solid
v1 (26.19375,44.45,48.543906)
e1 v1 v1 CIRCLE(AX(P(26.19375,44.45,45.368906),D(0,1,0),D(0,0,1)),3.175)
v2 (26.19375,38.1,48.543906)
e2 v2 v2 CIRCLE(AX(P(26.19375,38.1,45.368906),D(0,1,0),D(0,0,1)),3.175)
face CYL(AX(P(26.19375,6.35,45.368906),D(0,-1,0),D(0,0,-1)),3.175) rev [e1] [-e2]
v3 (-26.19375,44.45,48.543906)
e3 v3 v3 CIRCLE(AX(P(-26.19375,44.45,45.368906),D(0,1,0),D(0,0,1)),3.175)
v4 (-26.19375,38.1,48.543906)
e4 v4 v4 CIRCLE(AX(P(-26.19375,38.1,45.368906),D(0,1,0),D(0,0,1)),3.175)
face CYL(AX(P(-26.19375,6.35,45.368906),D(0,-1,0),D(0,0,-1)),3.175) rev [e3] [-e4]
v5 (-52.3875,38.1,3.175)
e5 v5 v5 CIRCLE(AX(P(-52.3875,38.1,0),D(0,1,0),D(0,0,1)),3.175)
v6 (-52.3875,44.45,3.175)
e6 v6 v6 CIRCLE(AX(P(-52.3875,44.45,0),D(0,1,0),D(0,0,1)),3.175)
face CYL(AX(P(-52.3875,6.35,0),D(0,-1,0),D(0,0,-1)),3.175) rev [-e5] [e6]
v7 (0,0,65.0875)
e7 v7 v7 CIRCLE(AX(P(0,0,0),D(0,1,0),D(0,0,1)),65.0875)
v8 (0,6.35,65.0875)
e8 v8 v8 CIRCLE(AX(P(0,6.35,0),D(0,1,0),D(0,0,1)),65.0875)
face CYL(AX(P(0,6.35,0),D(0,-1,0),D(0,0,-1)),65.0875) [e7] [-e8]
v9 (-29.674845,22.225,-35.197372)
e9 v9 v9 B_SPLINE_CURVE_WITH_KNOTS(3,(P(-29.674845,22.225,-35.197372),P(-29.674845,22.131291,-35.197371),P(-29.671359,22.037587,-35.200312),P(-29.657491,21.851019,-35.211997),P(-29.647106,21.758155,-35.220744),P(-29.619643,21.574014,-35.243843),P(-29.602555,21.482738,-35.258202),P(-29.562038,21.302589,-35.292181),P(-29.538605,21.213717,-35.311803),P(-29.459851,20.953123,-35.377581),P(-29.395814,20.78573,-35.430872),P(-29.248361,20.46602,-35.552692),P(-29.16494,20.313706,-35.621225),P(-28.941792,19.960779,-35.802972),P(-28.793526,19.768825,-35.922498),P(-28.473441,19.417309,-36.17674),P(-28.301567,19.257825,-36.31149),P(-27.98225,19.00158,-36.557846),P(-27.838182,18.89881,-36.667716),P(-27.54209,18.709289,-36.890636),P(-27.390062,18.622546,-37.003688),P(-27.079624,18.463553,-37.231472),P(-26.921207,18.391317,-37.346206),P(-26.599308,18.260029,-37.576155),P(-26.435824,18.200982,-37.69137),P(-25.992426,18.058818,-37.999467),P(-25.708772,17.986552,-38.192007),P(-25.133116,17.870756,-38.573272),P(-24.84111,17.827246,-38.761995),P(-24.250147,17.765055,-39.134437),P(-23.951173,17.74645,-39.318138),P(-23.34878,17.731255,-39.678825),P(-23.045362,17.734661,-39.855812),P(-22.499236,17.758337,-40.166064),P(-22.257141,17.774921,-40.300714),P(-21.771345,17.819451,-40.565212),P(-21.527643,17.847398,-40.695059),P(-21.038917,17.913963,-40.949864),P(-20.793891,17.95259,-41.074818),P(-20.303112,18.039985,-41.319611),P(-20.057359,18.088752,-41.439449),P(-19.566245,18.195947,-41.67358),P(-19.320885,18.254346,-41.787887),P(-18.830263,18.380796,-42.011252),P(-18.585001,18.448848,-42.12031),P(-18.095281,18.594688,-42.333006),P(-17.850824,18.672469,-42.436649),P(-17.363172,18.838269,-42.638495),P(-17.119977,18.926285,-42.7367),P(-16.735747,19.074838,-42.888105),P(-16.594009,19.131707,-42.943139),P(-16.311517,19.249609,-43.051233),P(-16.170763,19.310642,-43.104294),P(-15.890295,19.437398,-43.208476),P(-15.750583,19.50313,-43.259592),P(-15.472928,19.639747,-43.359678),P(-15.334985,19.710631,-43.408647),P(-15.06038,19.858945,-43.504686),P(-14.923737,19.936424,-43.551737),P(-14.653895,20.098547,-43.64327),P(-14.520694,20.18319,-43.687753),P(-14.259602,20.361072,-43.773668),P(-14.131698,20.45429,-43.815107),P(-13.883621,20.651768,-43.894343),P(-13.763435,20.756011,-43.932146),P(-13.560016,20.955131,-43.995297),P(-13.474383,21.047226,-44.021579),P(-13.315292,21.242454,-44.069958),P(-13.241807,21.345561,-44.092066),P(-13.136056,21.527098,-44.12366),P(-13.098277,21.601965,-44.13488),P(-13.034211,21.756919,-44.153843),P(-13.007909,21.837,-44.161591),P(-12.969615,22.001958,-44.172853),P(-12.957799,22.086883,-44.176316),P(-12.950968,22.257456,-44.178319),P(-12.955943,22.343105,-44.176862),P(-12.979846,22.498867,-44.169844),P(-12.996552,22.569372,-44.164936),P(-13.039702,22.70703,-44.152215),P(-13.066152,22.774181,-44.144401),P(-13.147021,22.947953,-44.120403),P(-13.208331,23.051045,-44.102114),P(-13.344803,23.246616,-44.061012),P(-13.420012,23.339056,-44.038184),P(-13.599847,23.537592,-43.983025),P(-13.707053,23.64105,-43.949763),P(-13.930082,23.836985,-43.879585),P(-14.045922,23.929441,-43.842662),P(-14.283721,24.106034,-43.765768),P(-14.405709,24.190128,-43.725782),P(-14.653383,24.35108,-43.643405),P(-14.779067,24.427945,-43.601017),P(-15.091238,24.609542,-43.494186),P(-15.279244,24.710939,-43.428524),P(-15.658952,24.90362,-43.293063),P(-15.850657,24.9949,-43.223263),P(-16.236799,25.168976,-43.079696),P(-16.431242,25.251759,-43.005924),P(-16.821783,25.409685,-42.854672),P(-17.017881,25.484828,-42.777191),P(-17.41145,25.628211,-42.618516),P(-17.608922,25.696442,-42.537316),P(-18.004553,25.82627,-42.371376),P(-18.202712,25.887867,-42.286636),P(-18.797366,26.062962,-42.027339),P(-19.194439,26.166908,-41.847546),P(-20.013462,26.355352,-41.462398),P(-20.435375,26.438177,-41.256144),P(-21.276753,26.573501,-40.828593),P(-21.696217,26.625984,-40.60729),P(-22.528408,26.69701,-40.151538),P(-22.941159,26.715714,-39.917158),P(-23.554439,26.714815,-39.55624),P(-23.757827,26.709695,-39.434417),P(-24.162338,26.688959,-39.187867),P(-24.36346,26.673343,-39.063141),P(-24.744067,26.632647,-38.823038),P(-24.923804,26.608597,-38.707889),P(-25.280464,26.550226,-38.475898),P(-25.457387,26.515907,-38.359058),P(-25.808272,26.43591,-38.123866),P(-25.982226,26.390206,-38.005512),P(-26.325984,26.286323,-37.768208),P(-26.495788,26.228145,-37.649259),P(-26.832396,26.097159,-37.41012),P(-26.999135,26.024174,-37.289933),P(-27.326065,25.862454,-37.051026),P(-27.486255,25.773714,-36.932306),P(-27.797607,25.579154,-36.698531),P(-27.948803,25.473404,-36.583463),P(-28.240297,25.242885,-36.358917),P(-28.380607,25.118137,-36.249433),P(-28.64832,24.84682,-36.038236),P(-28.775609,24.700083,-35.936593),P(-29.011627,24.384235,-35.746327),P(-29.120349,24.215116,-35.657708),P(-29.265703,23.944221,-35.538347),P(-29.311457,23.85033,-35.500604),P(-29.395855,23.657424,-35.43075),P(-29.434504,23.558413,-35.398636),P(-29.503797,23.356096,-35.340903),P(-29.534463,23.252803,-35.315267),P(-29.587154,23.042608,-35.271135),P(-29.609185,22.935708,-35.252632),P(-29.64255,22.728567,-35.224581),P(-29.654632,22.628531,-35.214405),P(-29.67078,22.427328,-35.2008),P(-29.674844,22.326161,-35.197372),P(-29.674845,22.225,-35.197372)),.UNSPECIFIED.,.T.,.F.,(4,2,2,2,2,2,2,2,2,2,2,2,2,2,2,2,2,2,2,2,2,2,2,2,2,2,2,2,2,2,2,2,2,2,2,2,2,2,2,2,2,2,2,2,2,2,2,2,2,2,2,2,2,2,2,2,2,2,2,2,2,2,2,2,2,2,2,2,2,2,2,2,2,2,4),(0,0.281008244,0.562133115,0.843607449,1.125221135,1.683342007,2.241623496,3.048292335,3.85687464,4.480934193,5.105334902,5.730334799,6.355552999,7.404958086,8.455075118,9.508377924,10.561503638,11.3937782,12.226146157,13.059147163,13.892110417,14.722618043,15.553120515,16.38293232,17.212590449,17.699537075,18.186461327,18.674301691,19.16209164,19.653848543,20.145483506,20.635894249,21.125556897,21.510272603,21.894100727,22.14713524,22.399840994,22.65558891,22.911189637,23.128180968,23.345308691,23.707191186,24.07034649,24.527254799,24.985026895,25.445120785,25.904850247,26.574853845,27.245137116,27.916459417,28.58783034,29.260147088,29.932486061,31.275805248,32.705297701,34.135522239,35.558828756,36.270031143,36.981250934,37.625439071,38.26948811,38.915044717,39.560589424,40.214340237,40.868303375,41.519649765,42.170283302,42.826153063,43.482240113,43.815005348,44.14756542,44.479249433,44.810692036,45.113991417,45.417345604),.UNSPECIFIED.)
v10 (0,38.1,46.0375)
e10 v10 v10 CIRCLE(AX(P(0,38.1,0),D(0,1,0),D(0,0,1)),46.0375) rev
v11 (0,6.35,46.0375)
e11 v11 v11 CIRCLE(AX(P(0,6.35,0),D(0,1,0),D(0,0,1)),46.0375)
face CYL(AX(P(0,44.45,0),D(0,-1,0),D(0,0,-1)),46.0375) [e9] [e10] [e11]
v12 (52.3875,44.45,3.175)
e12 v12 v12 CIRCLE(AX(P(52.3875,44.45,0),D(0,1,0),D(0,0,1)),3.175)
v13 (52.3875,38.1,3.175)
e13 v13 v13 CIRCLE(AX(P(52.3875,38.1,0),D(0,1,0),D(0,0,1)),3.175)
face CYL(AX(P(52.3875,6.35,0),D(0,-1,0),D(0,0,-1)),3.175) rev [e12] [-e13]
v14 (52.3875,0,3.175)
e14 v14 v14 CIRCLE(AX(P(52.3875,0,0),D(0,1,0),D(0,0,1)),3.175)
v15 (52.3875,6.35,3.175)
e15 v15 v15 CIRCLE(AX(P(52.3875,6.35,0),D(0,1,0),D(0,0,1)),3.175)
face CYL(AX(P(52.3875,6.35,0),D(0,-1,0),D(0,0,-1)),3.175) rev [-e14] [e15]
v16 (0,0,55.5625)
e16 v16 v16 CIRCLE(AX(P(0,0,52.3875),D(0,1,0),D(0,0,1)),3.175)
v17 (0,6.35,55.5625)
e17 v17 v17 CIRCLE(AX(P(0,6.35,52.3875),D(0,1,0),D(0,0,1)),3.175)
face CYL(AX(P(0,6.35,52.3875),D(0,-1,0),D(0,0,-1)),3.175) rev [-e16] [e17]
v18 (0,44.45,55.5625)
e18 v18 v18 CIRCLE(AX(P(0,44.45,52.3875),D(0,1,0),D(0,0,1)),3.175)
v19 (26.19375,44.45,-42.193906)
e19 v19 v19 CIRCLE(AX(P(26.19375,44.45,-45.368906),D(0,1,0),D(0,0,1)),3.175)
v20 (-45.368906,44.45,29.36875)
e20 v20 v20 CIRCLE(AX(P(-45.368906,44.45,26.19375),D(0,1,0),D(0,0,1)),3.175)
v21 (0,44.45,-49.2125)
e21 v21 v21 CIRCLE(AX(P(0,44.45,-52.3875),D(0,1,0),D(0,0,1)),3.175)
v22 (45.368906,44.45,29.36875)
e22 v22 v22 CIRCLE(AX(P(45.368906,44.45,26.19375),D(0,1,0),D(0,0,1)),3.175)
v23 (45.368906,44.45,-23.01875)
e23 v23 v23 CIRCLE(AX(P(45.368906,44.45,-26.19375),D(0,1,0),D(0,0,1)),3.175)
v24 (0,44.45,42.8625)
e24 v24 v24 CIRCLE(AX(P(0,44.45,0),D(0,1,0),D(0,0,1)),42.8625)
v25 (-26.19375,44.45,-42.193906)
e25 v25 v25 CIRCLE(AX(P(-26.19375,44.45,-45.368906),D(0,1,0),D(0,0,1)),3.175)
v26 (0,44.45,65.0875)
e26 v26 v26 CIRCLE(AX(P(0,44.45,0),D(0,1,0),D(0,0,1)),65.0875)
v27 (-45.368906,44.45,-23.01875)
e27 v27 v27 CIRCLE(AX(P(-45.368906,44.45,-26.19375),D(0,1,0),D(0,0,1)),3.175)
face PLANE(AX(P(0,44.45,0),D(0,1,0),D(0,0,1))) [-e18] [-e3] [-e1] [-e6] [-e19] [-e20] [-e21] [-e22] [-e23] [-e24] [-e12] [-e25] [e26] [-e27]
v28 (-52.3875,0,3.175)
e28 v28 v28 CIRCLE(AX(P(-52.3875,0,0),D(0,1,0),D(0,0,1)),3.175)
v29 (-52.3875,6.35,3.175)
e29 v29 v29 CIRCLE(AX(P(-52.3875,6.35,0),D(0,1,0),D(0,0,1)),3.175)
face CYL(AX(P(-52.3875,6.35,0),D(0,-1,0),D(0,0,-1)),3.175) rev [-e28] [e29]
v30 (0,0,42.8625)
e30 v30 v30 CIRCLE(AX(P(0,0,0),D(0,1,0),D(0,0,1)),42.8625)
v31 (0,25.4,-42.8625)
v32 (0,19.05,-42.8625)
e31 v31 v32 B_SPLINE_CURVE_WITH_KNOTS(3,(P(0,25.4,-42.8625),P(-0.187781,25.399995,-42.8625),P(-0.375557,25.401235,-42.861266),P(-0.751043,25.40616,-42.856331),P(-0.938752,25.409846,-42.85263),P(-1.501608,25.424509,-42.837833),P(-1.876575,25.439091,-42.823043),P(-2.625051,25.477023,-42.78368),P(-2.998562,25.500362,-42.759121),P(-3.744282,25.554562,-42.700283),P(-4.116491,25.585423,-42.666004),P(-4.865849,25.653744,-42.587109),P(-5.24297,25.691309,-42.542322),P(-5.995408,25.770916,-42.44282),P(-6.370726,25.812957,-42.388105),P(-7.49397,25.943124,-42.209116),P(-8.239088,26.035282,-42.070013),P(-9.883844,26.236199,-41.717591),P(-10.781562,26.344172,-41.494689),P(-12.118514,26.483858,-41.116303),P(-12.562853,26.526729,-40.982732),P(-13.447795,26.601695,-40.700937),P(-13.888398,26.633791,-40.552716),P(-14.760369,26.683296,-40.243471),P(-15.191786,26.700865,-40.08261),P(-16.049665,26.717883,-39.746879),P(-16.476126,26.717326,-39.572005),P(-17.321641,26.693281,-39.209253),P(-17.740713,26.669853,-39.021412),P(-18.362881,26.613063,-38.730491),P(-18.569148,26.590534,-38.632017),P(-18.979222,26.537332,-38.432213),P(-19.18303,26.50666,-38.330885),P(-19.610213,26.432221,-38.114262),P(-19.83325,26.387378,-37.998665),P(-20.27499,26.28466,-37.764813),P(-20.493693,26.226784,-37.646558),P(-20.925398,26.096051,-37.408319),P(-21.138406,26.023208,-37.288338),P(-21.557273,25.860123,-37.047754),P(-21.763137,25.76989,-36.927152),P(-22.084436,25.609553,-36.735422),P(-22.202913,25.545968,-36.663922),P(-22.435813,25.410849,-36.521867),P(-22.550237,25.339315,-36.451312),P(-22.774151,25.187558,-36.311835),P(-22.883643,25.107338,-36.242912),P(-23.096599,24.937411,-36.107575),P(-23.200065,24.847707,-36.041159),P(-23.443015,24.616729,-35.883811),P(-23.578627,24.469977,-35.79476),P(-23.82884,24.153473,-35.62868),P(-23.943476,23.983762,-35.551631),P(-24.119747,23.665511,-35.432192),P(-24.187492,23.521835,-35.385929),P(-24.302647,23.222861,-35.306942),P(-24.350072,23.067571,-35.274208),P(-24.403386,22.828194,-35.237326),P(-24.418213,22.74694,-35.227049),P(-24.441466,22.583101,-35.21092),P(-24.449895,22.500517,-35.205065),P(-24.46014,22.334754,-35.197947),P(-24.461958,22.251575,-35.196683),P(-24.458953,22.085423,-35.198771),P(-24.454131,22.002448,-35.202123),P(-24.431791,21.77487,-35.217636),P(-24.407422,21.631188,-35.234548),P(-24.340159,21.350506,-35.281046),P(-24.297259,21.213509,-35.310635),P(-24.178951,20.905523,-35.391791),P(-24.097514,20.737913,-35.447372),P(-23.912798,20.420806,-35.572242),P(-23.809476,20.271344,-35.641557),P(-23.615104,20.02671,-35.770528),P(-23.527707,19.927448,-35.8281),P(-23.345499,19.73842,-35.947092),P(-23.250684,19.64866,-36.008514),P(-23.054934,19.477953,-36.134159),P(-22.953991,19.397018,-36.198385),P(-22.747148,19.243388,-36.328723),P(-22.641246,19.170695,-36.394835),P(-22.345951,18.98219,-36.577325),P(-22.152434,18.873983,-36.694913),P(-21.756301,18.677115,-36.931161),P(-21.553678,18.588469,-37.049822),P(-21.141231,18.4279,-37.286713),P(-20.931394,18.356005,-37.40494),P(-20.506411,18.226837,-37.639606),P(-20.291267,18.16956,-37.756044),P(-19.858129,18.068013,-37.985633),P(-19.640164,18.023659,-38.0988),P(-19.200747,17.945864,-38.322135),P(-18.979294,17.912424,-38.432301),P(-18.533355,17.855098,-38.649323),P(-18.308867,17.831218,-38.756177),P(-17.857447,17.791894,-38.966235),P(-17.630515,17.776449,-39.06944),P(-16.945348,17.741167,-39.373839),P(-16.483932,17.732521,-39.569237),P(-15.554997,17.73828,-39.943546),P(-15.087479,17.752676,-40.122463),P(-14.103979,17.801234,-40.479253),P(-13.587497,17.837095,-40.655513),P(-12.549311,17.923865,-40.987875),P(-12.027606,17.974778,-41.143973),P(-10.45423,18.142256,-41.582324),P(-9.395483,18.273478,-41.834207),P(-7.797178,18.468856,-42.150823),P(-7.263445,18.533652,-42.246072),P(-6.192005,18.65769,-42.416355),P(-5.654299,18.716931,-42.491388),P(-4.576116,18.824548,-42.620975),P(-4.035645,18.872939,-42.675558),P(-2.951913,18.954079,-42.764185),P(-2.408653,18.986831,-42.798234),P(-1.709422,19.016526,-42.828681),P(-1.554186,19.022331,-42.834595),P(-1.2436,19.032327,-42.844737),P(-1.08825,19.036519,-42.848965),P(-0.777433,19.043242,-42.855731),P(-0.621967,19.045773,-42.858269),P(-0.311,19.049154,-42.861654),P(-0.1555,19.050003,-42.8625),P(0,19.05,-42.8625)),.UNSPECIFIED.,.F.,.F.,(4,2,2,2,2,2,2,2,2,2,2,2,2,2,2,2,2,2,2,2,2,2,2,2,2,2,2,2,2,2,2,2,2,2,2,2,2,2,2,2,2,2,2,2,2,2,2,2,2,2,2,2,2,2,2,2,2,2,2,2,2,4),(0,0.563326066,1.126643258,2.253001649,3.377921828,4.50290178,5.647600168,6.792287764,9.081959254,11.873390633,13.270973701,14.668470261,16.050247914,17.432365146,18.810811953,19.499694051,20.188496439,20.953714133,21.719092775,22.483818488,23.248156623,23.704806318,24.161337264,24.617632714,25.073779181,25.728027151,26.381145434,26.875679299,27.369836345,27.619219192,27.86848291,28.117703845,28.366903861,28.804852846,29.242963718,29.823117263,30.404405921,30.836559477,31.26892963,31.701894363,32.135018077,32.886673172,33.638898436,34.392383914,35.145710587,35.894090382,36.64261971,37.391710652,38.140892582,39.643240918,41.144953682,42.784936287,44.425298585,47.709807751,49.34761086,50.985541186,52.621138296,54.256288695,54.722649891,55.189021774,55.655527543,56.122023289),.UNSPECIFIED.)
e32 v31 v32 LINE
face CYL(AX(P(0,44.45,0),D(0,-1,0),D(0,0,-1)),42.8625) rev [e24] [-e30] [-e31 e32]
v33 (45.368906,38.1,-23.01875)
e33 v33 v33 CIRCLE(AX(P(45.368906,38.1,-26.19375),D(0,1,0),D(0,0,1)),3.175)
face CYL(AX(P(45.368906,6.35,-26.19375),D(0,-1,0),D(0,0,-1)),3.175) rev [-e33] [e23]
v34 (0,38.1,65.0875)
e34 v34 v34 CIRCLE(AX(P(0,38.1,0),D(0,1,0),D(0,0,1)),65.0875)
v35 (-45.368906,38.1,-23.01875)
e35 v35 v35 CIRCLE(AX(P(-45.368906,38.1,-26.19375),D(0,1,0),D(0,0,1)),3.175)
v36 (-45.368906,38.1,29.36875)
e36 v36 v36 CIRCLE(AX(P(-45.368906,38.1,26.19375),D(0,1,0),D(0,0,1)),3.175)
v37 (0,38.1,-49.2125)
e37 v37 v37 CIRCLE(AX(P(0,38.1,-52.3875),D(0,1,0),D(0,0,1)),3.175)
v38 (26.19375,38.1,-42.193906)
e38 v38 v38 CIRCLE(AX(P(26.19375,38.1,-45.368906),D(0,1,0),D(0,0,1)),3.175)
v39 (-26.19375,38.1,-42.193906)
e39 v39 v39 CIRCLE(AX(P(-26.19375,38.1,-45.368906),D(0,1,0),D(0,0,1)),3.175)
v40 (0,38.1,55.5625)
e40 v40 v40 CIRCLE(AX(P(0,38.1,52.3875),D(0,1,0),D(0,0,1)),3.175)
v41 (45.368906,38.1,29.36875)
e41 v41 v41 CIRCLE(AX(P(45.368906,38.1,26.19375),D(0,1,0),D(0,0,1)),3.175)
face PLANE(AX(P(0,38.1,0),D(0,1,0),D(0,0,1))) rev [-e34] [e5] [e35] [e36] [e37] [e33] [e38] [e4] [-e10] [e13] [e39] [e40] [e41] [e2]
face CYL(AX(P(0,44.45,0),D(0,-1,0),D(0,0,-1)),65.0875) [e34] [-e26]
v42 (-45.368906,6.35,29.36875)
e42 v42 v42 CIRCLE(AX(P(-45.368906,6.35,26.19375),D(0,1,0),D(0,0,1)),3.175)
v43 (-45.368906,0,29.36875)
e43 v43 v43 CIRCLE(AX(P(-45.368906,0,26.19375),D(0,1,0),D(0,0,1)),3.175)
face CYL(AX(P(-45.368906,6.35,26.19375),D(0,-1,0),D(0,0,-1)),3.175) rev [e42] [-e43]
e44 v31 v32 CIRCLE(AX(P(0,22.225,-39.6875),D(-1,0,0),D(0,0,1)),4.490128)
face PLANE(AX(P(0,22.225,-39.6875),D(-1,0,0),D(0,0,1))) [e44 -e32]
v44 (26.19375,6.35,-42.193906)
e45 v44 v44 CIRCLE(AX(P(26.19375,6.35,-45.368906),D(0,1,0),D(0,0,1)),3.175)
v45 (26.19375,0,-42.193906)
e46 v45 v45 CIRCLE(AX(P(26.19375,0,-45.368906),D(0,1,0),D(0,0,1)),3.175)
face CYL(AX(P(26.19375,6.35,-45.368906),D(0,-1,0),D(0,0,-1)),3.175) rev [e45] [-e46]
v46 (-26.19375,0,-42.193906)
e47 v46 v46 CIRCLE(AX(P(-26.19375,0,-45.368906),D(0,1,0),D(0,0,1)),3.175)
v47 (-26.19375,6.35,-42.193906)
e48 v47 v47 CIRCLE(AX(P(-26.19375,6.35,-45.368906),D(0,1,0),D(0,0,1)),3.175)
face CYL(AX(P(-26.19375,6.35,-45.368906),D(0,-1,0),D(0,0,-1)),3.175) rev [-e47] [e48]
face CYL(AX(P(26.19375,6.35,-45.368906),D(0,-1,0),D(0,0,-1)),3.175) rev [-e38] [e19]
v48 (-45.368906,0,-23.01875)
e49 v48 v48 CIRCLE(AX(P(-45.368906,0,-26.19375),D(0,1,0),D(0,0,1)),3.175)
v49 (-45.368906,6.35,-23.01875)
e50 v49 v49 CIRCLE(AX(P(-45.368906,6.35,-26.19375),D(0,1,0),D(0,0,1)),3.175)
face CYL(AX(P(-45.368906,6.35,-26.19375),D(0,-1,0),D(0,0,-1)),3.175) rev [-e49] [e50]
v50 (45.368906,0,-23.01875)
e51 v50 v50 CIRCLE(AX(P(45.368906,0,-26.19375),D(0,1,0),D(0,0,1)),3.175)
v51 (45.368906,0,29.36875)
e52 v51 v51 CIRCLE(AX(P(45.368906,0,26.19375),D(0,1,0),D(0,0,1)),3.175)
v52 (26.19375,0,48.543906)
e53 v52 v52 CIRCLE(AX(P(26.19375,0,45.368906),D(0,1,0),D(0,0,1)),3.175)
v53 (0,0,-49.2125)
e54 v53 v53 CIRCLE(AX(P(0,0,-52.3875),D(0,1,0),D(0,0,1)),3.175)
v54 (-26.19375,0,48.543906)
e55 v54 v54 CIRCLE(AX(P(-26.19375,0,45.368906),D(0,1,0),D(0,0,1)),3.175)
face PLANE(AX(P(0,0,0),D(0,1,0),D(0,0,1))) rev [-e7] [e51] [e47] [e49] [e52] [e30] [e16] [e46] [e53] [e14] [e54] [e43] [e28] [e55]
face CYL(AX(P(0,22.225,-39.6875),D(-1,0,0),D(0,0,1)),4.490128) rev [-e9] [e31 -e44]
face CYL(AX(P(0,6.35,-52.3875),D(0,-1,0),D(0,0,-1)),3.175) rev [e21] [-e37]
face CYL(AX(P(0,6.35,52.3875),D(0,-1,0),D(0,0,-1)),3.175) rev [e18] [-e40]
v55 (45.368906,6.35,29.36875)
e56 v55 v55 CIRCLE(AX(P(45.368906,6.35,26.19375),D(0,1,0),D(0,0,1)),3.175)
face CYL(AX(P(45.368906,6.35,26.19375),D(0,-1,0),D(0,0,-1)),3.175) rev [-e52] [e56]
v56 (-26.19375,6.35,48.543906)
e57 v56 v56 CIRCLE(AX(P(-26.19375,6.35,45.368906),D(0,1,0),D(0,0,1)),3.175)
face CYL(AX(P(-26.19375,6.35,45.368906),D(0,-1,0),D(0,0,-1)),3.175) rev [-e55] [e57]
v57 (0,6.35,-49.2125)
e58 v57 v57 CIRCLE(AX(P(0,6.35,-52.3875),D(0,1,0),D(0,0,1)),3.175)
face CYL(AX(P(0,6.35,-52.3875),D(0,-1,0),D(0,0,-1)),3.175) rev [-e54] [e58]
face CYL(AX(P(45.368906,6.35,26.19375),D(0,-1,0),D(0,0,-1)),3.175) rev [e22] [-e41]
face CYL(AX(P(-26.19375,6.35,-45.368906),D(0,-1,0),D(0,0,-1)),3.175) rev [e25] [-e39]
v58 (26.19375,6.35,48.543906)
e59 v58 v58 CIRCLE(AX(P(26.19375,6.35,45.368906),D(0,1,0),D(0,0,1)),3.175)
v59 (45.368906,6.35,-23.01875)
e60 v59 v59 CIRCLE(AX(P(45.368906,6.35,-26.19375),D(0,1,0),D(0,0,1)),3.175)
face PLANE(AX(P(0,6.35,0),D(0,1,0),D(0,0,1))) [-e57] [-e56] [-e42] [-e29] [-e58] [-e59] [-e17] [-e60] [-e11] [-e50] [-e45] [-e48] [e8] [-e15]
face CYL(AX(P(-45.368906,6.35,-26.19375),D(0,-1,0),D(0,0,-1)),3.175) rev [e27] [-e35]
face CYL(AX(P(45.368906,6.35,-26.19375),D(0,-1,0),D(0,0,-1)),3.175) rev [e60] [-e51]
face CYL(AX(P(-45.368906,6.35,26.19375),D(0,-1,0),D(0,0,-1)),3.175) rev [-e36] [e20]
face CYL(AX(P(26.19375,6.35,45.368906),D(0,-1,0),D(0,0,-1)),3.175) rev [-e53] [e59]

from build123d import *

# Parameters (mm, degrees)
SKETCH1_R            = 65.08749999999999
SKETCH1_R_2          = 3.1749999999997374
SKETCH1_R_3          = 3.174999999999826
SKETCH1_R_4          = 3.1749999999999874
SKETCH1_R_5          = 3.1749999999998075
SKETCH1_R_6          = 3.1749999999998435
SKETCH1_R_7          = 3.174999999999926
SKETCH1_R_8          = 3.1750000000000713
SKETCH1_R_9          = 3.1750000000002263
SKETCH1_R_10         = 3.1749999999999767
SKETCH1_R_11         = 3.175000000000085
SKETCH1_R_12         = 3.175000000000142
BOSS_EXTRUDE1_DEPTH  = 6.35
BOSS_EXTRUDE7_DEPTH  = 6.35
MOVE_FACE6_BY        = 6.35
MOVE_FACE6_2_BY      = 6.35
MOVE_FACE6_3_BY      = 6.35
BOSS_EXTRUDE8_START  = 44.449999999999996
BOSS_EXTRUDE8_DEPTH  = 44.449999999999996
BOSS_EXTRUDE10_START = 6.35
SKETCH1_13_R         = 65.08749999999999
SKETCH1_13_R_2       = 3.1749999999997374
SKETCH1_13_R_3       = 3.174999999999826
SKETCH1_13_R_4       = 3.1749999999999874
SKETCH1_13_R_5       = 3.1749999999998075
SKETCH1_13_R_6       = 3.1749999999998435
SKETCH1_13_R_7       = 3.174999999999926
SKETCH1_13_R_8       = 3.1750000000000713
SKETCH1_13_R_9       = 3.1750000000002263
SKETCH1_13_R_10      = 3.1749999999999767
SKETCH1_13_R_11      = 3.175000000000085
SKETCH1_13_R_12      = 3.175000000000142
BOSS_EXTRUDE10_DEPTH = 6.35
SKETCH2_R            = 4.49012806053458
CUT_EXTRUDE1_DEPTH   = 38.1


with BuildPart() as part:
    # Sketch1 → Boss-Extrude1 (new body)
    # profile 1 of 2: a face of its own
    with BuildSketch(Plane(origin=(0, 0, 0), x_dir=(1, 0, 0), z_dir=(0, 1, 0))):
        with Locations(Location((0, 0, 0), (0, 0, 270))):
            Circle(SKETCH1_R)
        with Locations(Location((-26.193749999999444, -45.36890584075757, 0), (0, 0, 270))):
            Circle(SKETCH1_R_2, mode=Mode.SUBTRACT)
        with Locations(Location((-45.36890584075695, -26.193750000000517, 0), (0, 0, 270))):
            Circle(SKETCH1_R_3, mode=Mode.SUBTRACT)
        with Locations(Location((-52.38749999999999, -5.8287e-13, 0), (0, 0, 270))):
            Circle(SKETCH1_R_4, mode=Mode.SUBTRACT)
        with Locations(Location((5.8437e-13, -52.38749999999999, 0), (0, 0, 270))):
            Circle(SKETCH1_R_5, mode=Mode.SUBTRACT)
        with Locations(Location((26.193750000000502, -45.368905840756966, 0), (0, 0, 270))):
            Circle(SKETCH1_R_6, mode=Mode.SUBTRACT)
        with Locations(Location((45.36890584075758, -26.193749999999447, 0), (0, 0, 270))):
            Circle(SKETCH1_R_7, mode=Mode.SUBTRACT)
        with Locations(Location((-45.36890584075756, 26.193749999999472, 0), (0, 0, 270))):
            Circle(SKETCH1_R_8, mode=Mode.SUBTRACT)
        with Locations(Location((-6.0368e-13, 52.38750000000001, 0), (0, 0, 270))):
            Circle(SKETCH1_R_9, mode=Mode.SUBTRACT)
        with BuildLine():
            Line((-24.244761862165653, 42.86249999999999), (-16.800520825261128, 42.8625))
            ThreePointArc((-16.80052082526106, 42.86249999999964), (25.94221876360081, 38.03225856916045), (46.0375, 0))
            ThreePointArc((46.0375, -1.128e-14), (-20.353392839950203, -41.29395604870844), (-28.040840750590878, 36.51250000000003))
            Line((-28.040840750590878, 36.51249999999999), (-38.10000000000001, 36.51249999999999))
            Line((-38.10000000000001, 36.51249999999999), (-38.10000000000001, 42.86249999999999))
            Line((-38.10000000000001, 42.86249999999999), (-28.142738137835213, 42.86249999999999))
            ThreePointArc((-28.142738137835213, 42.86249999999998), (-27.588846351937473, 48.2209807291169), (-23.01875000000034, 45.36890584075697))
            ThreePointArc((-23.01875000000034, 45.36890584075697), (-23.341675111640548, 43.973809488820095), (-24.24476186216568, 42.86250000000009))
        make_face(mode=Mode.SUBTRACT)
        with Locations(Location((52.38749999999997, 5.8711e-13, 0), (0, 0, 270))):
            Circle(SKETCH1_R_10, mode=Mode.SUBTRACT)
        with Locations(Location((45.36890584075695, 26.19375000000053, 0), (0, 0, 270))):
            Circle(SKETCH1_R_11, mode=Mode.SUBTRACT)
        with Locations(Location((26.19374999999944, 45.36890584075759, 0), (0, 0, 270))):
            Circle(SKETCH1_R_12, mode=Mode.SUBTRACT)
    # profile 2 of 2: a face of its own
    with BuildSketch(Plane(origin=(0, 0, 0), x_dir=(1, 0, 0), z_dir=(0, 1, 0))):
        with BuildLine():
            ThreePointArc((-28.040840750590878, 36.51250000000003), (-22.644371309313744, 40.08346110624591), (-16.80052082526106, 42.86249999999964))
            Line((-16.800520825261128, 42.8625), (-24.244761862165653, 42.86249999999999))
            ThreePointArc((-24.24476186216568, 42.86250000000009), (-26.19375000000043, 42.1939058407568), (-28.142738137835213, 42.86249999999998))
            Line((-28.142738137835213, 42.86249999999999), (-38.10000000000001, 42.86249999999999))
            Line((-38.10000000000001, 42.86249999999999), (-38.10000000000001, 36.51249999999999))
            Line((-38.10000000000001, 36.51249999999999), (-28.040840750590878, 36.51249999999999))
        make_face()
    extrude(amount=BOSS_EXTRUDE1_DEPTH)


with BuildPart() as part_1:
    # Move Face4: read off the stored shape, not the designer's step
    # Move Face4: moved
    add(part.part.moved(Location((0, 44.45, 0))))

    # Move Face6: a face moved outward by 6.35
    extrude(part_1.faces().sort_by_distance((-32.54375, 44.45, 52.07))[0], amount=MOVE_FACE6_BY, dir=(0, -1, 0))

    # Move Face6 2: a curved face moved outward by 6.35
    add(Solid.thicken(part_1.faces().sort_by_distance((0, 47.625, -65.0875))[0], -MOVE_FACE6_2_BY))

    # Move Face6 3: a face moved inward by 6.35
    extrude(part_1.faces().sort_by_distance((-32.54375, 50.8, 52.07))[0], amount=MOVE_FACE6_3_BY, dir=(0, -1, 0), mode=Mode.SUBTRACT)

    # Sketch1<11> → Boss-Extrude8 (add)
    with BuildSketch(Plane(origin=(0, 0, 0), x_dir=(1, 0, 0), z_dir=(0, 1, 0)).offset(BOSS_EXTRUDE8_START)):
        with BuildLine():
            ThreePointArc((-22.45064030267289, 36.512499999999996), (-11.66569490000489, 41.244459855233885), (2.62e-15, 42.8625))
            Line((0, 42.8625), (-16.800520825261128, 42.8625))
            ThreePointArc((-16.80052082526106, 42.86249999999964), (-22.644371309313744, 40.08346110624591), (-28.040840750590878, 36.51250000000003))
            Line((-28.040840750590878, 36.51249999999999), (-22.4506403026729, 36.51249999999999))
        make_face()
        with BuildLine():
            Line((-16.800520825261128, 42.8625), (0, 42.8625))
            ThreePointArc((2.62e-15, 42.8625), (30.308364408608394, 30.308364408608387), (42.8625, 0))
            ThreePointArc((42.8625, -1.05e-14), (-20.91534527896545, -37.41312922105898), (-22.45064030267289, 36.512499999999996))
            Line((-22.4506403026729, 36.51249999999999), (-28.040840750590878, 36.51249999999999))
            ThreePointArc((-28.040840750590878, 36.51250000000003), (-20.353392839950203, -41.29395604870844), (46.0375, -1.128e-14))
            ThreePointArc((46.0375, 0), (25.94221876360081, 38.03225856916045), (-16.80052082526106, 42.86249999999964))
        make_face()
    extrude(amount=-BOSS_EXTRUDE8_DEPTH)

    # Sketch1<13> → Boss-Extrude10 (add)
    # profile 1 of 2: a face of its own
    with BuildSketch(Plane(origin=(0, 0, 0), x_dir=(1, 0, 0), z_dir=(0, 1, 0)).offset(BOSS_EXTRUDE10_START)):
        with Locations(Location((0, 0, 0), (0, 0, 270))):
            Circle(SKETCH1_13_R)
        with Locations(Location((-26.193749999999444, -45.36890584075757, 0), (0, 0, 270))):
            Circle(SKETCH1_13_R_2, mode=Mode.SUBTRACT)
        with Locations(Location((-45.36890584075695, -26.193750000000517, 0), (0, 0, 270))):
            Circle(SKETCH1_13_R_3, mode=Mode.SUBTRACT)
        with Locations(Location((-52.38749999999999, -5.8287e-13, 0), (0, 0, 270))):
            Circle(SKETCH1_13_R_4, mode=Mode.SUBTRACT)
        with Locations(Location((5.8437e-13, -52.38749999999999, 0), (0, 0, 270))):
            Circle(SKETCH1_13_R_5, mode=Mode.SUBTRACT)
        with Locations(Location((26.193750000000502, -45.368905840756966, 0), (0, 0, 270))):
            Circle(SKETCH1_13_R_6, mode=Mode.SUBTRACT)
        with Locations(Location((45.36890584075758, -26.193749999999447, 0), (0, 0, 270))):
            Circle(SKETCH1_13_R_7, mode=Mode.SUBTRACT)
        with Locations(Location((-45.36890584075756, 26.193749999999472, 0), (0, 0, 270))):
            Circle(SKETCH1_13_R_8, mode=Mode.SUBTRACT)
        with Locations(Location((-6.0368e-13, 52.38750000000001, 0), (0, 0, 270))):
            Circle(SKETCH1_13_R_9, mode=Mode.SUBTRACT)
        with BuildLine():
            Line((-24.244761862165653, 42.86249999999999), (-16.800520825261128, 42.8625))
            ThreePointArc((-16.80052082526106, 42.86249999999964), (25.94221876360081, 38.03225856916045), (46.0375, 0))
            ThreePointArc((46.0375, -1.128e-14), (-20.353392839950203, -41.29395604870844), (-28.040840750590878, 36.51250000000003))
            Line((-28.040840750590878, 36.51249999999999), (-38.10000000000001, 36.51249999999999))
            Line((-38.10000000000001, 36.51249999999999), (-38.10000000000001, 42.86249999999999))
            Line((-38.10000000000001, 42.86249999999999), (-28.142738137835213, 42.86249999999999))
            ThreePointArc((-28.142738137835213, 42.86249999999998), (-27.588846351937473, 48.2209807291169), (-23.01875000000034, 45.36890584075697))
            ThreePointArc((-23.01875000000034, 45.36890584075697), (-23.341675111640548, 43.973809488820095), (-24.24476186216568, 42.86250000000009))
        make_face(mode=Mode.SUBTRACT)
        with Locations(Location((52.38749999999997, 5.8711e-13, 0), (0, 0, 270))):
            Circle(SKETCH1_13_R_10, mode=Mode.SUBTRACT)
        with Locations(Location((45.36890584075695, 26.19375000000053, 0), (0, 0, 270))):
            Circle(SKETCH1_13_R_11, mode=Mode.SUBTRACT)
        with Locations(Location((26.19374999999944, 45.36890584075759, 0), (0, 0, 270))):
            Circle(SKETCH1_13_R_12, mode=Mode.SUBTRACT)
    # profile 2 of 2: a face of its own
    with BuildSketch(Plane(origin=(0, 0, 0), x_dir=(1, 0, 0), z_dir=(0, 1, 0)).offset(BOSS_EXTRUDE10_START)):
        with BuildLine():
            ThreePointArc((-28.040840750590878, 36.51250000000003), (-22.644371309313744, 40.08346110624591), (-16.80052082526106, 42.86249999999964))
            Line((-16.800520825261128, 42.8625), (-24.244761862165653, 42.86249999999999))
            ThreePointArc((-24.24476186216568, 42.86250000000009), (-26.19375000000043, 42.1939058407568), (-28.142738137835213, 42.86249999999998))
            Line((-28.142738137835213, 42.86249999999999), (-38.10000000000001, 42.86249999999999))
            Line((-38.10000000000001, 42.86249999999999), (-38.10000000000001, 36.51249999999999))
            Line((-38.10000000000001, 36.51249999999999), (-28.040840750590878, 36.51249999999999))
        make_face()
    extrude(amount=-BOSS_EXTRUDE10_DEPTH)


with BuildPart() as body_2:
    # Sketch1<9> → Boss-Extrude7 (new body)
    with BuildSketch(Plane(origin=(0, 0, 0), x_dir=(1, 0, 0), z_dir=(0, 1, 0))):
        Polygon((0, 36.51249999999999), (0, 42.8625), (-38.10000000000001, 42.86249999999999), (-38.10000000000001, 36.51249999999999), align=None)
    extrude(amount=BOSS_EXTRUDE7_DEPTH)


with BuildPart() as body_2_1:
    # Move Face5: read off the stored shape, not the designer's step
    # Move Face5: moved
    add(body_2.part.moved(Location((0, 19.05, 0))))


with BuildPart() as cut_extrude1_tool:
    # Sketch2 → Cut-Extrude1 (new body)
    with BuildSketch(Plane.ZY.offset(38.10000000000001)):
        with Locations((-39.68749999999999, 22.225)):
            Circle(SKETCH2_R)
    extrude(amount=-CUT_EXTRUDE1_DEPTH)


with BuildPart() as part_2:
    add(part_1.part)

    # Cut-Extrude1: cut by cut_extrude1_tool
    add(cut_extrude1_tool.part, mode=Mode.SUBTRACT)


with BuildPart() as body_2_2:
    add(body_2_1.part)

    # Cut-Extrude1: cut by cut_extrude1_tool
    add(cut_extrude1_tool.part, mode=Mode.SUBTRACT)


solid = part_2.part
